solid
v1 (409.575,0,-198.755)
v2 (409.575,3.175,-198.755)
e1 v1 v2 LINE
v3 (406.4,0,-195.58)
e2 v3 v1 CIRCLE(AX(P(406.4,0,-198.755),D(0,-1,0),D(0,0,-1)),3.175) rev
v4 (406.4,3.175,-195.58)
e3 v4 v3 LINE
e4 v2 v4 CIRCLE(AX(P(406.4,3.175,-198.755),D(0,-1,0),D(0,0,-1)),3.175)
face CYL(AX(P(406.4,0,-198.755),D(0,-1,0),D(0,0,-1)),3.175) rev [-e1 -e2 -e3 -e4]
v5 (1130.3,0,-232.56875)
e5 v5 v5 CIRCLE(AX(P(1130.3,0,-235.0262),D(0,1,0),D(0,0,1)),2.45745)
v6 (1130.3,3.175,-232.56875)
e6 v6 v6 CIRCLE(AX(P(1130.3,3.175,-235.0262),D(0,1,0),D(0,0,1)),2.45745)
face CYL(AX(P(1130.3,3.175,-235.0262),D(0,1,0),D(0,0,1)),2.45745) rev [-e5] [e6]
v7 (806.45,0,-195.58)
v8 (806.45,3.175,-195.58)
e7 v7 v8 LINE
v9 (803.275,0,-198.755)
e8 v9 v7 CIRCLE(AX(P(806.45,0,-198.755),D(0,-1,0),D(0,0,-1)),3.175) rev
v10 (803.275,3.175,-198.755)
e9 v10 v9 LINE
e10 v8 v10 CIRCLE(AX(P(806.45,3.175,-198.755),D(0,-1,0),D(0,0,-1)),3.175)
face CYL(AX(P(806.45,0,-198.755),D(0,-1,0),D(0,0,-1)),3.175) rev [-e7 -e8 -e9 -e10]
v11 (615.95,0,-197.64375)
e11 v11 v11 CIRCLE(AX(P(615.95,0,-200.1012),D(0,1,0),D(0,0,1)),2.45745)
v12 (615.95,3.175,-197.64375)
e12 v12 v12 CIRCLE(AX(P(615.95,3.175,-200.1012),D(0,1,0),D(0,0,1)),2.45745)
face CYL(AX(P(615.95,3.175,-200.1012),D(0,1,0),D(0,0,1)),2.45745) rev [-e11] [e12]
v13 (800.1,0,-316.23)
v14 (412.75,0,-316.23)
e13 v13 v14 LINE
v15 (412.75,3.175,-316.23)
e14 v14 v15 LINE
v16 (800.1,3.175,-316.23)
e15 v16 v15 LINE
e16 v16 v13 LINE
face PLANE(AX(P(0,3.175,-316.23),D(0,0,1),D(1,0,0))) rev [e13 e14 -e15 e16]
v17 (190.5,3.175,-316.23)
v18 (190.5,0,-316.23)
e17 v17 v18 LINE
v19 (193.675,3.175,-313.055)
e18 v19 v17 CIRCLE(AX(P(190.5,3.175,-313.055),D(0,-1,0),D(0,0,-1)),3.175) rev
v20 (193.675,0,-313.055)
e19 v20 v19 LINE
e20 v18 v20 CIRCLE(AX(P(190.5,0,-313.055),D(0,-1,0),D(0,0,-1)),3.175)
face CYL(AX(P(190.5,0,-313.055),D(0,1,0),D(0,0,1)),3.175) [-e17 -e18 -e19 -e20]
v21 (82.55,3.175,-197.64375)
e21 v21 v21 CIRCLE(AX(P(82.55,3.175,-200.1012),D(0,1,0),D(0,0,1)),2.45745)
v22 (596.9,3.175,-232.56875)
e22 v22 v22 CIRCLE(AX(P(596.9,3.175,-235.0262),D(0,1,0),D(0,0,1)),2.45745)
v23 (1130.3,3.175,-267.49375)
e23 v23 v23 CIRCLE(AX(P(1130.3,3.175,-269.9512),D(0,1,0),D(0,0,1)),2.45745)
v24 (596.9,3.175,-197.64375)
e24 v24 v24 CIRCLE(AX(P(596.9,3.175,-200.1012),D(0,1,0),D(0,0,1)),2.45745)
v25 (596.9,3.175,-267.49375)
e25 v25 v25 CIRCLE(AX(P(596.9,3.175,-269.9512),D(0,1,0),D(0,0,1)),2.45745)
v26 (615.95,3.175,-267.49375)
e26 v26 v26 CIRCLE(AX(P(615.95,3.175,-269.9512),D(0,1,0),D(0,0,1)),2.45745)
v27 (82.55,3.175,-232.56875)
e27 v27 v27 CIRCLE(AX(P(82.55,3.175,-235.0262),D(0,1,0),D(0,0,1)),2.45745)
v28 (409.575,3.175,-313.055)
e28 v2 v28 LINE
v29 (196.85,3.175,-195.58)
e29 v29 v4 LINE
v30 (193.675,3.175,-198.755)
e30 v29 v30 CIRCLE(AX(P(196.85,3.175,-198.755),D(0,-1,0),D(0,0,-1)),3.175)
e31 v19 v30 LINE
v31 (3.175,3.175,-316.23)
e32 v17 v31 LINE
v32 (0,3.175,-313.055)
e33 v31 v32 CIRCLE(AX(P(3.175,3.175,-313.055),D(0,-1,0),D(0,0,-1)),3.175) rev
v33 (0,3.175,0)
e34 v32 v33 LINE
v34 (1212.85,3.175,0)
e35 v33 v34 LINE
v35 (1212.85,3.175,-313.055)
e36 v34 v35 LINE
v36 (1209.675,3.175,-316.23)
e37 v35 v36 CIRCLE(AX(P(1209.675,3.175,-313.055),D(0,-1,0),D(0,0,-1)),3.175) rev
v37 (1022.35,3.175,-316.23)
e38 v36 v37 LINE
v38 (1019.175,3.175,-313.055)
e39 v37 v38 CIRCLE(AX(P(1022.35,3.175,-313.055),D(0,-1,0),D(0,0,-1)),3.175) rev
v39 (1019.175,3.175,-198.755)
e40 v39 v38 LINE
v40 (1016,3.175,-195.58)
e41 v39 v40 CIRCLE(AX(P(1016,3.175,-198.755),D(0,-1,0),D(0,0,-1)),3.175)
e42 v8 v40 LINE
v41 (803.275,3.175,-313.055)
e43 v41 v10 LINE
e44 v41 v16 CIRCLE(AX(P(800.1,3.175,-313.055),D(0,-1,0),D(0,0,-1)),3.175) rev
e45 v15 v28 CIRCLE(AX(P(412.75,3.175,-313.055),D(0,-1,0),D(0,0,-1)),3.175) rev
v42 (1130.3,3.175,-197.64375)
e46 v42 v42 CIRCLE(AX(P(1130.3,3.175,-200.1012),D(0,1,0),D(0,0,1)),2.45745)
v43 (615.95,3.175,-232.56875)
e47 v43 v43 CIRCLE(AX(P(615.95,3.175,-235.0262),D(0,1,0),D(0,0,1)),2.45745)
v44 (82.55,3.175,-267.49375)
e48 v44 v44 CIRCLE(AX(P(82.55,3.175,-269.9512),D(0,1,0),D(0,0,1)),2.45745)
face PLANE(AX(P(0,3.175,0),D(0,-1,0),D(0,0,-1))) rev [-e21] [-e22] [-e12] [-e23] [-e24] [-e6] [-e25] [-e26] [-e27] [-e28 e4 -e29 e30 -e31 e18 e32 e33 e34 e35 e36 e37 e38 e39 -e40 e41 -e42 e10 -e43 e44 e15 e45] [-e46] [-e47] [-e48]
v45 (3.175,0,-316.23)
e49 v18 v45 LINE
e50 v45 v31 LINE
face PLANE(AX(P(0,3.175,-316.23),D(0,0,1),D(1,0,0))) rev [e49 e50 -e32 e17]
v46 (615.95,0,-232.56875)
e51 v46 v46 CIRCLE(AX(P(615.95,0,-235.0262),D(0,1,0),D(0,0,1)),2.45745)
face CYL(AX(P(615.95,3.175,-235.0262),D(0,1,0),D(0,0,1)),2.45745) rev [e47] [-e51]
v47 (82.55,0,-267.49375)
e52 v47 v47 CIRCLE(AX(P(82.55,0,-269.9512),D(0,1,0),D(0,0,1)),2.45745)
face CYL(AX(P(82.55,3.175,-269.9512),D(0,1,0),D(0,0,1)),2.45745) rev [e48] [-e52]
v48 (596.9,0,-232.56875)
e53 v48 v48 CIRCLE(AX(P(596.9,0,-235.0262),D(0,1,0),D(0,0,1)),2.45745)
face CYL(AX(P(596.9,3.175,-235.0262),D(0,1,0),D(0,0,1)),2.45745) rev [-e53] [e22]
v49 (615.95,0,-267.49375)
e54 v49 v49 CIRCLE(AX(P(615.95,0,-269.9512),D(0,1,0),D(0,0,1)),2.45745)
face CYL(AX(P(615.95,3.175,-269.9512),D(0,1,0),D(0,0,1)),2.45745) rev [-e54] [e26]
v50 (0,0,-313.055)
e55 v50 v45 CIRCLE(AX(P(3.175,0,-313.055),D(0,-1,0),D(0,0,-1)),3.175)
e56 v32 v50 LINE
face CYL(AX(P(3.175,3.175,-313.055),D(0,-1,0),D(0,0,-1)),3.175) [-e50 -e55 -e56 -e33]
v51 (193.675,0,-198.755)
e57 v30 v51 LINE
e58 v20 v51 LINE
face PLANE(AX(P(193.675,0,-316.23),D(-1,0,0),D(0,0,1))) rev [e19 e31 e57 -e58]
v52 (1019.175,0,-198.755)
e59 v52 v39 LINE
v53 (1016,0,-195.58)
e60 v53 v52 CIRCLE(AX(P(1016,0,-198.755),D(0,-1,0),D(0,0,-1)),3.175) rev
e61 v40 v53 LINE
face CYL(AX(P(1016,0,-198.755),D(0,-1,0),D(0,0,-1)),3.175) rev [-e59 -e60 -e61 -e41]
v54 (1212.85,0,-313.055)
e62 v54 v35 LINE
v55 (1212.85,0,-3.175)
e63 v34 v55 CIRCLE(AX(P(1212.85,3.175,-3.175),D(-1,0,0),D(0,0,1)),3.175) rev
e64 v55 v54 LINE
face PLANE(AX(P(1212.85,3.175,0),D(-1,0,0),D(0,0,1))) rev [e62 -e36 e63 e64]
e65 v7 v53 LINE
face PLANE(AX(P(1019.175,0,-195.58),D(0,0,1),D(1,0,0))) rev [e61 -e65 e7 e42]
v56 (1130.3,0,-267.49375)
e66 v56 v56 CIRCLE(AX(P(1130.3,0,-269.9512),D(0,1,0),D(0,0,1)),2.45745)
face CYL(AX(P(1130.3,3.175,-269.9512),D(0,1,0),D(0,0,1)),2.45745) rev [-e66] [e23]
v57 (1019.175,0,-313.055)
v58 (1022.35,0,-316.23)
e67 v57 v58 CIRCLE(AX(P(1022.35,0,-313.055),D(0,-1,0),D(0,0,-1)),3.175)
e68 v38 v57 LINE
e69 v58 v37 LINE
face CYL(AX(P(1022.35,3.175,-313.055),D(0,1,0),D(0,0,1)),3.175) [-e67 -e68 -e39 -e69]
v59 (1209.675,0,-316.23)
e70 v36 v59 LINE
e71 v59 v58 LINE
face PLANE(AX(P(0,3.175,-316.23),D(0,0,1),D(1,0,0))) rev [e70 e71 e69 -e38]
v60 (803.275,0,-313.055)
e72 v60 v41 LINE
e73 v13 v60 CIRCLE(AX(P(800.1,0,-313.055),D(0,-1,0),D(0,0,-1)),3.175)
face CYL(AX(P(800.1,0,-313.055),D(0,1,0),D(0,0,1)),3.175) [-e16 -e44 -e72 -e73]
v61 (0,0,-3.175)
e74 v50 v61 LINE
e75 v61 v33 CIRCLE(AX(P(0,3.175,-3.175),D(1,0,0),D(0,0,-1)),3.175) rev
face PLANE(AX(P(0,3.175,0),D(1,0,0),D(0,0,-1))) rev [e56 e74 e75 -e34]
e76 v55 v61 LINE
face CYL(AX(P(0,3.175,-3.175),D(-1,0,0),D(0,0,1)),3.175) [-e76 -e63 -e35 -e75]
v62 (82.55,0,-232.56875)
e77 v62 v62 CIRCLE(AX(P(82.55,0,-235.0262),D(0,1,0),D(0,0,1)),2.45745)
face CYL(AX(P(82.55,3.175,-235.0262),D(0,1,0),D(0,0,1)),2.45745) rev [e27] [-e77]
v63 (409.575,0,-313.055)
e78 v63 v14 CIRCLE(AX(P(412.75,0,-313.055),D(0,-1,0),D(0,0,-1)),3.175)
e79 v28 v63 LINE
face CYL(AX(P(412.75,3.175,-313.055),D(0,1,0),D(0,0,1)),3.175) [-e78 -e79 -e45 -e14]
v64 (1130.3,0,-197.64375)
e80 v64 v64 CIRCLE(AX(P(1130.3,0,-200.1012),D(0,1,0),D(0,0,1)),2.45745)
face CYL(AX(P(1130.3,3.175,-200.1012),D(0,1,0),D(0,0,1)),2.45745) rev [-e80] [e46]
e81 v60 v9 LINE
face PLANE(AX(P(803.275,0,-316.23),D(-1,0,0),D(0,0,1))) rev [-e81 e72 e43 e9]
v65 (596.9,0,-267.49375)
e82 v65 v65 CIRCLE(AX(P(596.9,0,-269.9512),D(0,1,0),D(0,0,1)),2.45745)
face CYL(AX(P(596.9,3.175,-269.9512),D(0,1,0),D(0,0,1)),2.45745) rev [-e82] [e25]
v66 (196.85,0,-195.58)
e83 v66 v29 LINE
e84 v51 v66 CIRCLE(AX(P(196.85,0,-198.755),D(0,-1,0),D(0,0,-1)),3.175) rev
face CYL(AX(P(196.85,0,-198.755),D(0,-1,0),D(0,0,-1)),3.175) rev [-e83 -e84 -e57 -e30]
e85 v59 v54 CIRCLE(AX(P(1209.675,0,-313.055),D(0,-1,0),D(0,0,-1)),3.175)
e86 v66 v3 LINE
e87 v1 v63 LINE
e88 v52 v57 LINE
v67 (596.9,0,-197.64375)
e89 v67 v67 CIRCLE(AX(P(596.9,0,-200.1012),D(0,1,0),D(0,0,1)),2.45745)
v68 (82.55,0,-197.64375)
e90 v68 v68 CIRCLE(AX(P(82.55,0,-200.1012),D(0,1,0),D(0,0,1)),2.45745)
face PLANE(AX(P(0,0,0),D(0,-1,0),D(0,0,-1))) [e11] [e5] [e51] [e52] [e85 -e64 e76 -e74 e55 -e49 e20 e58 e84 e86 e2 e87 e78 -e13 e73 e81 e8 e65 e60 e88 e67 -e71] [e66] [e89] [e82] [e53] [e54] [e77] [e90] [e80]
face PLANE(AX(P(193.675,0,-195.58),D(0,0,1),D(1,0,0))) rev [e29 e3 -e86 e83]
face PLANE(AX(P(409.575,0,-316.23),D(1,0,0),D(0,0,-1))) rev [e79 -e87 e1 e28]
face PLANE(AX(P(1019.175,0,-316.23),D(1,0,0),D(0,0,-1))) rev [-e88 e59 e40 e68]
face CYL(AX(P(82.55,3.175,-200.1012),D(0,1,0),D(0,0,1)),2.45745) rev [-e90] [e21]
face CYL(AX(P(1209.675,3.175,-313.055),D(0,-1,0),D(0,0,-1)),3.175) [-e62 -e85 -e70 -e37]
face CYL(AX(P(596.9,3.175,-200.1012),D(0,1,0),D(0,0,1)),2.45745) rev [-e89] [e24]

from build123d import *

# Parameters (mm, degrees)
SKETCH1_W                    = 1212.85
SKETCH1_H                    = 316.23
BOSS_EXTRUDE1_DEPTH          = 3.175
FILLET1_R                    = 3.175
SKETCH4_W                    = 215.9
SKETCH4_H                    = 120.65
CUT_EXTRUDE1_DEPTH           = 1254.402016922
FILLET2_R                    = 3.175
F_10_0_1935_DIAMETER_HOLE1_D = 4.9149


with BuildPart() as part:
    # Sketch1 → Boss-Extrude1 (new body)
    with BuildSketch(Plane(origin=(0, 0, 0), x_dir=(1, 0, 0), z_dir=(0, 1, 0))):
        with Locations((606.425, 158.115)):
            Rectangle(SKETCH1_W, SKETCH1_H)
    extrude(amount=BOSS_EXTRUDE1_DEPTH)

    # Fillet1
    fillet1_edges = [part.edges().sort_by_distance(p)[0] for p in [
        (606.425, 0, 0),
    ]]
    fillet(fillet1_edges, radius=FILLET1_R - 0.0001)  # a hair under: the kernel refuses the full size

    # Sketch4 → Cut-Extrude1 (cut, through all)
    with BuildSketch(Plane(origin=(0, 3.175, 0), x_dir=(1, 0, 0), z_dir=(0, 1, 0))):
        with Locations((301.625, 255.905)):
            Rectangle(SKETCH4_W, SKETCH4_H)
        with Locations((911.225, 255.905)):
            Rectangle(SKETCH4_W, SKETCH4_H)
    extrude(amount=-CUT_EXTRUDE1_DEPTH, mode=Mode.SUBTRACT)

    # Fillet2
    fillet2_edges = [part.edges().sort_by_distance(p)[0] for p in [
        (193.675, 1.5875, -195.58),
        (193.675, 1.5875, -316.23),
        (409.575, 1.5875, -316.23),
        (409.575, 1.5875, -195.58),
        (803.275, 1.5875, -316.23),
        (1019.175, 1.5875, -316.23),
        (1019.175, 1.5875, -195.58),
        (803.275, 1.5875, -195.58),
        (0, 1.5875, -316.23),
        (1212.85, 1.5875, -316.23),
    ]]
    fillet(fillet2_edges, radius=FILLET2_R)

    # #10 (0.1935) Diameter Hole1 (through all)
    with Locations(Plane(origin=(0, 3.175, 0), x_dir=(1, 0, 0), z_dir=(0, 1, 0))):
        with Locations((82.55, 200.1012), (82.55, 235.0262), (82.55, 269.9512), (596.9, 200.1012), (596.9, 235.0262), (596.9, 269.9512), (615.95, 269.9512), (615.95, 235.0262), (615.95, 200.1012), (1130.3, 269.9512), (1130.3, 235.0262), (1130.3, 200.1012)):
            Hole(F_10_0_1935_DIAMETER_HOLE1_D / 2)


solid = part.part
